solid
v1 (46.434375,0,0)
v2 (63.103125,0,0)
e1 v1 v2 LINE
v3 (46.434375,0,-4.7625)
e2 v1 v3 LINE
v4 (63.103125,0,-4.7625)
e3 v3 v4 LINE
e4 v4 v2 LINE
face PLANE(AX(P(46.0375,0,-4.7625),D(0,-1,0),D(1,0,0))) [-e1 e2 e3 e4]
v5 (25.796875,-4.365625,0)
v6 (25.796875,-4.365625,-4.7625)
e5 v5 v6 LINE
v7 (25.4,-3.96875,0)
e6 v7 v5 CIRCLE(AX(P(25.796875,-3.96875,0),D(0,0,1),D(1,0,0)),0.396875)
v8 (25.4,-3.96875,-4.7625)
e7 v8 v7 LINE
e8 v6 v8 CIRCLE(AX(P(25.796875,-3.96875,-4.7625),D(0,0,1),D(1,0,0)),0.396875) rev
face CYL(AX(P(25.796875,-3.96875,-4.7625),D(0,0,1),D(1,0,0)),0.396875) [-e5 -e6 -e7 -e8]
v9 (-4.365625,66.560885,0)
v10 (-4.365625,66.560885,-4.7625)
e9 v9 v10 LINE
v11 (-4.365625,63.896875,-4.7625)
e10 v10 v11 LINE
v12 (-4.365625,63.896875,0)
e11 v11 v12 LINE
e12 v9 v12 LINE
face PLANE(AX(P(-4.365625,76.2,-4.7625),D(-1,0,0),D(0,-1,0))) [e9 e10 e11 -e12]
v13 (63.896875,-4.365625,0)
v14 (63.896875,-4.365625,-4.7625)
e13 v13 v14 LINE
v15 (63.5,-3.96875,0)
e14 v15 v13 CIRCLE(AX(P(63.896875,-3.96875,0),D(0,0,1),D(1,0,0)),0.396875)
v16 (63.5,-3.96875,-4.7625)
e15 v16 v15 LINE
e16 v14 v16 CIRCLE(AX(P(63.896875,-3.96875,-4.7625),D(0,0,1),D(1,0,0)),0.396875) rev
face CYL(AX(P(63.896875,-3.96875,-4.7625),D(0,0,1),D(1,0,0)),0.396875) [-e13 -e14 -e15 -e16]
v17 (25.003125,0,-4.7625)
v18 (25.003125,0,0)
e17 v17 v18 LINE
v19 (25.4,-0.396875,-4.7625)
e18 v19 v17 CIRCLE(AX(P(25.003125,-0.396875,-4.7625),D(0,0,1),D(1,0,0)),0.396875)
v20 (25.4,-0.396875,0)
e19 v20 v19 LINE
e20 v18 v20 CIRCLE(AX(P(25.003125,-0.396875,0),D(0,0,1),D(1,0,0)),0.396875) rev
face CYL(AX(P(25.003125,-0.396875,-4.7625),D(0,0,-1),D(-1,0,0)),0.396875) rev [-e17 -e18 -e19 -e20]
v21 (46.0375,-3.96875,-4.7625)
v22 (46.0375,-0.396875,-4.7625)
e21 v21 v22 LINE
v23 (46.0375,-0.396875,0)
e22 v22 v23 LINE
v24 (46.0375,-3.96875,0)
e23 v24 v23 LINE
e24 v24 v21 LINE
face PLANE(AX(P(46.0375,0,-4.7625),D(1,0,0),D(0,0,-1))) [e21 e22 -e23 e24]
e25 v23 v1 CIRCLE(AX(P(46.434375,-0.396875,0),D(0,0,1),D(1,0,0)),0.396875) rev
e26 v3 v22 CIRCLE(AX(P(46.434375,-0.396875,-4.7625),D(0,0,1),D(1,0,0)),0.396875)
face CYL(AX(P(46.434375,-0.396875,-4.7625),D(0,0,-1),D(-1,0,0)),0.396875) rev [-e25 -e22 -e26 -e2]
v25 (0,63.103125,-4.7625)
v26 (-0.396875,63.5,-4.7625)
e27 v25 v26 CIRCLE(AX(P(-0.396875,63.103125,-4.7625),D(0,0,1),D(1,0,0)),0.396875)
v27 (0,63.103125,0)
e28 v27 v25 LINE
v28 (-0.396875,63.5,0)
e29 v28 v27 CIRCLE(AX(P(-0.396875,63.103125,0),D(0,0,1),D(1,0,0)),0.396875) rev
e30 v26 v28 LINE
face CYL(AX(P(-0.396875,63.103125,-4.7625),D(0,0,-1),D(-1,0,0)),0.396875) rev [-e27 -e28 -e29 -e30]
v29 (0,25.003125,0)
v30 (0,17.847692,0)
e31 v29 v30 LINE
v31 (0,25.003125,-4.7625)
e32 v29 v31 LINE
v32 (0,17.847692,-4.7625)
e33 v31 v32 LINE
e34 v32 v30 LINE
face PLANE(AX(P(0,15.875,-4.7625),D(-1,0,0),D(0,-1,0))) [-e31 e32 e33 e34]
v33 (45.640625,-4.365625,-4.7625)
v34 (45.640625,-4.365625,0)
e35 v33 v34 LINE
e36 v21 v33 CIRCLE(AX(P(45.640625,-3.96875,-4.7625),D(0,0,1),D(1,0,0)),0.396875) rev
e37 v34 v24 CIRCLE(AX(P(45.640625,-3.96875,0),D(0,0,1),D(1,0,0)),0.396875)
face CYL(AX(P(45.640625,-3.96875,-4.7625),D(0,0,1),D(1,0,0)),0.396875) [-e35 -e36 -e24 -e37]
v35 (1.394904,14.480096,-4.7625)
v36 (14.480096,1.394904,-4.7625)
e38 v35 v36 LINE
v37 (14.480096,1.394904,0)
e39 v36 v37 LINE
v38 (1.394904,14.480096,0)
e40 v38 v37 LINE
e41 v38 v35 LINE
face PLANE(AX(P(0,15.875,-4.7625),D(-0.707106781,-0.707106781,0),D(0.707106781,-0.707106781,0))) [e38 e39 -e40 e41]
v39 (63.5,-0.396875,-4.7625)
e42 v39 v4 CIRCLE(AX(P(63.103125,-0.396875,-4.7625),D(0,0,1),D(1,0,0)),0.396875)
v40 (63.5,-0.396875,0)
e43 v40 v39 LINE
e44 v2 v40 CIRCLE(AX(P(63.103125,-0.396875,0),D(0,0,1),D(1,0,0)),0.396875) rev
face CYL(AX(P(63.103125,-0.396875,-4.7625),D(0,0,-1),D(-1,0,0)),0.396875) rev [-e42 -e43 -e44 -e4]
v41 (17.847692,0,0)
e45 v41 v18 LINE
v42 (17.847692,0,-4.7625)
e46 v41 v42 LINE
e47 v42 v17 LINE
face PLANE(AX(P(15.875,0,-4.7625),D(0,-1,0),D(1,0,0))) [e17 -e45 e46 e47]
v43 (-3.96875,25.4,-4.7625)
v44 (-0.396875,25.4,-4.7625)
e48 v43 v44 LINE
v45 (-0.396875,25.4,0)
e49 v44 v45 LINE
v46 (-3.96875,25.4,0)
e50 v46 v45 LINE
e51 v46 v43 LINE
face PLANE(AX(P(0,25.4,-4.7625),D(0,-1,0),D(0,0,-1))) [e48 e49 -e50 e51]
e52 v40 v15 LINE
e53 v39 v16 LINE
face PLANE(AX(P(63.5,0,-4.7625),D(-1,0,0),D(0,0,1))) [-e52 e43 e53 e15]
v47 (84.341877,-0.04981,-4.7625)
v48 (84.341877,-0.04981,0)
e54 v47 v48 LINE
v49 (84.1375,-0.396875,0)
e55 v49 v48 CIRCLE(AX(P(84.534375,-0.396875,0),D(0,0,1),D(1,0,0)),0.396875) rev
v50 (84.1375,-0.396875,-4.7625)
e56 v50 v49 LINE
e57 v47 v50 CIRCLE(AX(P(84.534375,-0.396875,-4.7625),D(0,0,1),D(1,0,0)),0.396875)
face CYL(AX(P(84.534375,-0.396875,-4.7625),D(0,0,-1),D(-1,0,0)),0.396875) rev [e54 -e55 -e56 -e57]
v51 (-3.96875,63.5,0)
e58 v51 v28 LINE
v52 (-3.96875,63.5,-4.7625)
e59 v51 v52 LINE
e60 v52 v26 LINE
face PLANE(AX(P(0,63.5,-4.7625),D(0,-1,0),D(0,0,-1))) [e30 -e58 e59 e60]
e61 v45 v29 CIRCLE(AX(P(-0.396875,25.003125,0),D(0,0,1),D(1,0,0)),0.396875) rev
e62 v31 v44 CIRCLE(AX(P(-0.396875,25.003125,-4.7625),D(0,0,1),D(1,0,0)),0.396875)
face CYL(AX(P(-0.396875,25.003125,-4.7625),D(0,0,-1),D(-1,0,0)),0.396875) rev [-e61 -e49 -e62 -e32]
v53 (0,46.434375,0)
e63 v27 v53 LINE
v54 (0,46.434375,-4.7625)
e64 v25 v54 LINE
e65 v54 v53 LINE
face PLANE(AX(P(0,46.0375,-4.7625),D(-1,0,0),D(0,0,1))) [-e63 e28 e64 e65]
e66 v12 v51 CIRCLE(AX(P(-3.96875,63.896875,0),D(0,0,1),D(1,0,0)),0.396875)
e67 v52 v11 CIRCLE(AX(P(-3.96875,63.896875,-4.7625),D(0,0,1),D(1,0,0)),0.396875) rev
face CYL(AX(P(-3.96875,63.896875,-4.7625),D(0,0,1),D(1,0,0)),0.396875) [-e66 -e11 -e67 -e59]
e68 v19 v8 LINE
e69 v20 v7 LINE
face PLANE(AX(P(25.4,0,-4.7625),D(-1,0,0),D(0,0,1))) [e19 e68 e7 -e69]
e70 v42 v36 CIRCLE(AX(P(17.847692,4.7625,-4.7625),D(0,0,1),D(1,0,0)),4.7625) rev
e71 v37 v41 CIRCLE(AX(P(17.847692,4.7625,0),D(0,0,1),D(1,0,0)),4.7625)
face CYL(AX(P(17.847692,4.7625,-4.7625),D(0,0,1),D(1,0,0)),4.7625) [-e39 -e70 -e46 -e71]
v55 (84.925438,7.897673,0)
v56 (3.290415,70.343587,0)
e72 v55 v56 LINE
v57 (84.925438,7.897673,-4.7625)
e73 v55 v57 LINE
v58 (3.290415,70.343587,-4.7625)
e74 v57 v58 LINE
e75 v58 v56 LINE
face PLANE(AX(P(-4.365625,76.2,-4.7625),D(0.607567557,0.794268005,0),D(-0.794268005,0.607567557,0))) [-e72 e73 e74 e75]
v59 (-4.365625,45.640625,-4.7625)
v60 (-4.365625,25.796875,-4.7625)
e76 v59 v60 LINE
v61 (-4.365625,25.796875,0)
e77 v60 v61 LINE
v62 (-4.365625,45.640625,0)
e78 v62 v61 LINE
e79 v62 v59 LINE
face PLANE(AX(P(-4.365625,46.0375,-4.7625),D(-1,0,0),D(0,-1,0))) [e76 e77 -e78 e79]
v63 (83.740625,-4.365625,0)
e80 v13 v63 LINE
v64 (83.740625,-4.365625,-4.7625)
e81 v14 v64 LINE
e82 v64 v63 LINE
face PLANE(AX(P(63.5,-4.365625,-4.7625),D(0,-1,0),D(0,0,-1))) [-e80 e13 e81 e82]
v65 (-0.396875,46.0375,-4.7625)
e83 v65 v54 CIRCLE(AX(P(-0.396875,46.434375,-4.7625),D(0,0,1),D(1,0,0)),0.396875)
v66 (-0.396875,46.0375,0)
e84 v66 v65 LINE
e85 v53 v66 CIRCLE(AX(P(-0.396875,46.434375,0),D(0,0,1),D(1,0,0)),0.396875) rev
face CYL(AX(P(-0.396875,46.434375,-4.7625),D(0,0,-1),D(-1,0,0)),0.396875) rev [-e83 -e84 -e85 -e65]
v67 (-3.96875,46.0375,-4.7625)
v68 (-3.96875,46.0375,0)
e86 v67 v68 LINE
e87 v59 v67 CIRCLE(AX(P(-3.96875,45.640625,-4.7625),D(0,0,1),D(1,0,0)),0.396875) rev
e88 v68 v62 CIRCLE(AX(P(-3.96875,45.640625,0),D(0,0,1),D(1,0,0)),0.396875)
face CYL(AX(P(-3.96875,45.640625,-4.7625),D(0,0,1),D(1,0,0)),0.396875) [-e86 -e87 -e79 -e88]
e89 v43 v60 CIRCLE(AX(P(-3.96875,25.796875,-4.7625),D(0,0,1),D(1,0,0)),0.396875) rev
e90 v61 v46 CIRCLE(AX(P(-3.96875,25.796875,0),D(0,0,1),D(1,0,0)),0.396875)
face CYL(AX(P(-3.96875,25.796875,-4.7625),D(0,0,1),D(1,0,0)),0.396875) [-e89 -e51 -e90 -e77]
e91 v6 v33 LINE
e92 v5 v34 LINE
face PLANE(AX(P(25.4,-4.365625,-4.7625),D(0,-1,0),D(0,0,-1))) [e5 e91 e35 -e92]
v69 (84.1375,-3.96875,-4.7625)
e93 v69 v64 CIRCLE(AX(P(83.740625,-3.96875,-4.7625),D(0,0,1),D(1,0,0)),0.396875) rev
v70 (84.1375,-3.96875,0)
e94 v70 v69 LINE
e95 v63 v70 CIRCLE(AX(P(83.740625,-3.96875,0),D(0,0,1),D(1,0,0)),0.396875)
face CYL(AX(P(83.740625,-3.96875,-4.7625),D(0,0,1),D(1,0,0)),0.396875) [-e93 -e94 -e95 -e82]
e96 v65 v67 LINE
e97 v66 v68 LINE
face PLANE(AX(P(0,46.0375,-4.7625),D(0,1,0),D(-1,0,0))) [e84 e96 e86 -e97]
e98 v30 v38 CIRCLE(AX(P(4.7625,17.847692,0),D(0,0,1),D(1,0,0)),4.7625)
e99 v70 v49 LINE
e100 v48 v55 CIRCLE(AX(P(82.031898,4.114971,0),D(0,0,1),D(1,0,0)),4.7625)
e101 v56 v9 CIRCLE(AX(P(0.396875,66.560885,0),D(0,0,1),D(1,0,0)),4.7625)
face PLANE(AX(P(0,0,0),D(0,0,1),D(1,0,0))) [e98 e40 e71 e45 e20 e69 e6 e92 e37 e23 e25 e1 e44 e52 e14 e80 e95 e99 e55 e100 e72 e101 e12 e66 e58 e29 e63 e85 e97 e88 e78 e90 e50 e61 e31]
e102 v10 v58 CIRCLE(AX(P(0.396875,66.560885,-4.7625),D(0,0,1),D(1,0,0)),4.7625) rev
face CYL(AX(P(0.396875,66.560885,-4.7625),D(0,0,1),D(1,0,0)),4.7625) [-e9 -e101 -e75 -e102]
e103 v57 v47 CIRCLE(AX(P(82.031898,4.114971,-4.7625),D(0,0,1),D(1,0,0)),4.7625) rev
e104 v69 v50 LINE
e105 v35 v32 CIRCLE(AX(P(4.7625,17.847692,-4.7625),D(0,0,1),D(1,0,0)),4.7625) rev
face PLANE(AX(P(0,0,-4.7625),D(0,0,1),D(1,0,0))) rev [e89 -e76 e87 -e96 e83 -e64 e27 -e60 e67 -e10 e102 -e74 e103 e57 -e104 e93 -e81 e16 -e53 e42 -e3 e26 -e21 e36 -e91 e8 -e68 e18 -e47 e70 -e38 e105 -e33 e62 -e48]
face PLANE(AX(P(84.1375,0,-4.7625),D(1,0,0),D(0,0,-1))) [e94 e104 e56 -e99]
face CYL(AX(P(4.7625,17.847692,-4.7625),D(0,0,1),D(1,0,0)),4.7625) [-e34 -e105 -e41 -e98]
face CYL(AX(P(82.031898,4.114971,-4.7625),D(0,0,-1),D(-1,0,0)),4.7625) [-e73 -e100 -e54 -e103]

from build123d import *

# Parameters (mm, degrees)
BASE_FLANGE1_DEPTH = 4.7625
FILLET1_R          = 0.396875
FILLET2_R          = 4.7625


# Sheet-metal steps are written as plain solids
with BuildPart() as part:
    # Sketch1 → Base-Flange1 (new body)
    with BuildSketch(Plane.XY):
        Polygon((-4.365625, 76.2), (95.25, 0), (84.1375, 0), (84.1375, -4.365625), (63.5, -4.365625), (63.5, 0), (46.0375, 0), (46.0375, -4.365625), (25.4, -4.365625), (25.4, 0), (15.875, 0), (0, 15.875), (0, 25.4), (-4.365625, 25.4), (-4.365625, 46.0375), (0, 46.0375), (0, 63.5), (-4.365625, 63.5), align=None)
    extrude(amount=-BASE_FLANGE1_DEPTH)

    # Fillet1
    fillet1_edges = [part.edges().sort_by_distance(p)[0] for p in [
        (25.4, 0, -2.38125),
        (0, 25.4, -2.38125),
        (-4.365625, 25.4, -2.38125),
        (-4.365625, 46.0375, -2.38125),
        (0, 46.0375, -2.38125),
        (0, 63.5, -2.38125),
        (-4.365625, 63.5, -2.38125),
        (84.1375, 0, -2.38125),
        (84.1375, -4.365625, -2.38125),
        (63.5, -4.365625, -2.38125),
        (63.5, 0, -2.38125),
        (46.0375, 0, -2.38125),
        (46.0375, -4.365625, -2.38125),
        (25.4, -4.365625, -2.38125),
    ]]
    fillet(fillet1_edges, radius=FILLET1_R)

    # Fillet2
    fillet2_edges = [part.edges().sort_by_distance(p)[0] for p in [
        (95.25, 0, -2.38125),
        (15.875, 0, -2.38125),
        (0, 15.875, -2.38125),
        (-4.365625, 76.2, -2.38125),
    ]]
    fillet(fillet2_edges, radius=FILLET2_R)


solid = part.part
